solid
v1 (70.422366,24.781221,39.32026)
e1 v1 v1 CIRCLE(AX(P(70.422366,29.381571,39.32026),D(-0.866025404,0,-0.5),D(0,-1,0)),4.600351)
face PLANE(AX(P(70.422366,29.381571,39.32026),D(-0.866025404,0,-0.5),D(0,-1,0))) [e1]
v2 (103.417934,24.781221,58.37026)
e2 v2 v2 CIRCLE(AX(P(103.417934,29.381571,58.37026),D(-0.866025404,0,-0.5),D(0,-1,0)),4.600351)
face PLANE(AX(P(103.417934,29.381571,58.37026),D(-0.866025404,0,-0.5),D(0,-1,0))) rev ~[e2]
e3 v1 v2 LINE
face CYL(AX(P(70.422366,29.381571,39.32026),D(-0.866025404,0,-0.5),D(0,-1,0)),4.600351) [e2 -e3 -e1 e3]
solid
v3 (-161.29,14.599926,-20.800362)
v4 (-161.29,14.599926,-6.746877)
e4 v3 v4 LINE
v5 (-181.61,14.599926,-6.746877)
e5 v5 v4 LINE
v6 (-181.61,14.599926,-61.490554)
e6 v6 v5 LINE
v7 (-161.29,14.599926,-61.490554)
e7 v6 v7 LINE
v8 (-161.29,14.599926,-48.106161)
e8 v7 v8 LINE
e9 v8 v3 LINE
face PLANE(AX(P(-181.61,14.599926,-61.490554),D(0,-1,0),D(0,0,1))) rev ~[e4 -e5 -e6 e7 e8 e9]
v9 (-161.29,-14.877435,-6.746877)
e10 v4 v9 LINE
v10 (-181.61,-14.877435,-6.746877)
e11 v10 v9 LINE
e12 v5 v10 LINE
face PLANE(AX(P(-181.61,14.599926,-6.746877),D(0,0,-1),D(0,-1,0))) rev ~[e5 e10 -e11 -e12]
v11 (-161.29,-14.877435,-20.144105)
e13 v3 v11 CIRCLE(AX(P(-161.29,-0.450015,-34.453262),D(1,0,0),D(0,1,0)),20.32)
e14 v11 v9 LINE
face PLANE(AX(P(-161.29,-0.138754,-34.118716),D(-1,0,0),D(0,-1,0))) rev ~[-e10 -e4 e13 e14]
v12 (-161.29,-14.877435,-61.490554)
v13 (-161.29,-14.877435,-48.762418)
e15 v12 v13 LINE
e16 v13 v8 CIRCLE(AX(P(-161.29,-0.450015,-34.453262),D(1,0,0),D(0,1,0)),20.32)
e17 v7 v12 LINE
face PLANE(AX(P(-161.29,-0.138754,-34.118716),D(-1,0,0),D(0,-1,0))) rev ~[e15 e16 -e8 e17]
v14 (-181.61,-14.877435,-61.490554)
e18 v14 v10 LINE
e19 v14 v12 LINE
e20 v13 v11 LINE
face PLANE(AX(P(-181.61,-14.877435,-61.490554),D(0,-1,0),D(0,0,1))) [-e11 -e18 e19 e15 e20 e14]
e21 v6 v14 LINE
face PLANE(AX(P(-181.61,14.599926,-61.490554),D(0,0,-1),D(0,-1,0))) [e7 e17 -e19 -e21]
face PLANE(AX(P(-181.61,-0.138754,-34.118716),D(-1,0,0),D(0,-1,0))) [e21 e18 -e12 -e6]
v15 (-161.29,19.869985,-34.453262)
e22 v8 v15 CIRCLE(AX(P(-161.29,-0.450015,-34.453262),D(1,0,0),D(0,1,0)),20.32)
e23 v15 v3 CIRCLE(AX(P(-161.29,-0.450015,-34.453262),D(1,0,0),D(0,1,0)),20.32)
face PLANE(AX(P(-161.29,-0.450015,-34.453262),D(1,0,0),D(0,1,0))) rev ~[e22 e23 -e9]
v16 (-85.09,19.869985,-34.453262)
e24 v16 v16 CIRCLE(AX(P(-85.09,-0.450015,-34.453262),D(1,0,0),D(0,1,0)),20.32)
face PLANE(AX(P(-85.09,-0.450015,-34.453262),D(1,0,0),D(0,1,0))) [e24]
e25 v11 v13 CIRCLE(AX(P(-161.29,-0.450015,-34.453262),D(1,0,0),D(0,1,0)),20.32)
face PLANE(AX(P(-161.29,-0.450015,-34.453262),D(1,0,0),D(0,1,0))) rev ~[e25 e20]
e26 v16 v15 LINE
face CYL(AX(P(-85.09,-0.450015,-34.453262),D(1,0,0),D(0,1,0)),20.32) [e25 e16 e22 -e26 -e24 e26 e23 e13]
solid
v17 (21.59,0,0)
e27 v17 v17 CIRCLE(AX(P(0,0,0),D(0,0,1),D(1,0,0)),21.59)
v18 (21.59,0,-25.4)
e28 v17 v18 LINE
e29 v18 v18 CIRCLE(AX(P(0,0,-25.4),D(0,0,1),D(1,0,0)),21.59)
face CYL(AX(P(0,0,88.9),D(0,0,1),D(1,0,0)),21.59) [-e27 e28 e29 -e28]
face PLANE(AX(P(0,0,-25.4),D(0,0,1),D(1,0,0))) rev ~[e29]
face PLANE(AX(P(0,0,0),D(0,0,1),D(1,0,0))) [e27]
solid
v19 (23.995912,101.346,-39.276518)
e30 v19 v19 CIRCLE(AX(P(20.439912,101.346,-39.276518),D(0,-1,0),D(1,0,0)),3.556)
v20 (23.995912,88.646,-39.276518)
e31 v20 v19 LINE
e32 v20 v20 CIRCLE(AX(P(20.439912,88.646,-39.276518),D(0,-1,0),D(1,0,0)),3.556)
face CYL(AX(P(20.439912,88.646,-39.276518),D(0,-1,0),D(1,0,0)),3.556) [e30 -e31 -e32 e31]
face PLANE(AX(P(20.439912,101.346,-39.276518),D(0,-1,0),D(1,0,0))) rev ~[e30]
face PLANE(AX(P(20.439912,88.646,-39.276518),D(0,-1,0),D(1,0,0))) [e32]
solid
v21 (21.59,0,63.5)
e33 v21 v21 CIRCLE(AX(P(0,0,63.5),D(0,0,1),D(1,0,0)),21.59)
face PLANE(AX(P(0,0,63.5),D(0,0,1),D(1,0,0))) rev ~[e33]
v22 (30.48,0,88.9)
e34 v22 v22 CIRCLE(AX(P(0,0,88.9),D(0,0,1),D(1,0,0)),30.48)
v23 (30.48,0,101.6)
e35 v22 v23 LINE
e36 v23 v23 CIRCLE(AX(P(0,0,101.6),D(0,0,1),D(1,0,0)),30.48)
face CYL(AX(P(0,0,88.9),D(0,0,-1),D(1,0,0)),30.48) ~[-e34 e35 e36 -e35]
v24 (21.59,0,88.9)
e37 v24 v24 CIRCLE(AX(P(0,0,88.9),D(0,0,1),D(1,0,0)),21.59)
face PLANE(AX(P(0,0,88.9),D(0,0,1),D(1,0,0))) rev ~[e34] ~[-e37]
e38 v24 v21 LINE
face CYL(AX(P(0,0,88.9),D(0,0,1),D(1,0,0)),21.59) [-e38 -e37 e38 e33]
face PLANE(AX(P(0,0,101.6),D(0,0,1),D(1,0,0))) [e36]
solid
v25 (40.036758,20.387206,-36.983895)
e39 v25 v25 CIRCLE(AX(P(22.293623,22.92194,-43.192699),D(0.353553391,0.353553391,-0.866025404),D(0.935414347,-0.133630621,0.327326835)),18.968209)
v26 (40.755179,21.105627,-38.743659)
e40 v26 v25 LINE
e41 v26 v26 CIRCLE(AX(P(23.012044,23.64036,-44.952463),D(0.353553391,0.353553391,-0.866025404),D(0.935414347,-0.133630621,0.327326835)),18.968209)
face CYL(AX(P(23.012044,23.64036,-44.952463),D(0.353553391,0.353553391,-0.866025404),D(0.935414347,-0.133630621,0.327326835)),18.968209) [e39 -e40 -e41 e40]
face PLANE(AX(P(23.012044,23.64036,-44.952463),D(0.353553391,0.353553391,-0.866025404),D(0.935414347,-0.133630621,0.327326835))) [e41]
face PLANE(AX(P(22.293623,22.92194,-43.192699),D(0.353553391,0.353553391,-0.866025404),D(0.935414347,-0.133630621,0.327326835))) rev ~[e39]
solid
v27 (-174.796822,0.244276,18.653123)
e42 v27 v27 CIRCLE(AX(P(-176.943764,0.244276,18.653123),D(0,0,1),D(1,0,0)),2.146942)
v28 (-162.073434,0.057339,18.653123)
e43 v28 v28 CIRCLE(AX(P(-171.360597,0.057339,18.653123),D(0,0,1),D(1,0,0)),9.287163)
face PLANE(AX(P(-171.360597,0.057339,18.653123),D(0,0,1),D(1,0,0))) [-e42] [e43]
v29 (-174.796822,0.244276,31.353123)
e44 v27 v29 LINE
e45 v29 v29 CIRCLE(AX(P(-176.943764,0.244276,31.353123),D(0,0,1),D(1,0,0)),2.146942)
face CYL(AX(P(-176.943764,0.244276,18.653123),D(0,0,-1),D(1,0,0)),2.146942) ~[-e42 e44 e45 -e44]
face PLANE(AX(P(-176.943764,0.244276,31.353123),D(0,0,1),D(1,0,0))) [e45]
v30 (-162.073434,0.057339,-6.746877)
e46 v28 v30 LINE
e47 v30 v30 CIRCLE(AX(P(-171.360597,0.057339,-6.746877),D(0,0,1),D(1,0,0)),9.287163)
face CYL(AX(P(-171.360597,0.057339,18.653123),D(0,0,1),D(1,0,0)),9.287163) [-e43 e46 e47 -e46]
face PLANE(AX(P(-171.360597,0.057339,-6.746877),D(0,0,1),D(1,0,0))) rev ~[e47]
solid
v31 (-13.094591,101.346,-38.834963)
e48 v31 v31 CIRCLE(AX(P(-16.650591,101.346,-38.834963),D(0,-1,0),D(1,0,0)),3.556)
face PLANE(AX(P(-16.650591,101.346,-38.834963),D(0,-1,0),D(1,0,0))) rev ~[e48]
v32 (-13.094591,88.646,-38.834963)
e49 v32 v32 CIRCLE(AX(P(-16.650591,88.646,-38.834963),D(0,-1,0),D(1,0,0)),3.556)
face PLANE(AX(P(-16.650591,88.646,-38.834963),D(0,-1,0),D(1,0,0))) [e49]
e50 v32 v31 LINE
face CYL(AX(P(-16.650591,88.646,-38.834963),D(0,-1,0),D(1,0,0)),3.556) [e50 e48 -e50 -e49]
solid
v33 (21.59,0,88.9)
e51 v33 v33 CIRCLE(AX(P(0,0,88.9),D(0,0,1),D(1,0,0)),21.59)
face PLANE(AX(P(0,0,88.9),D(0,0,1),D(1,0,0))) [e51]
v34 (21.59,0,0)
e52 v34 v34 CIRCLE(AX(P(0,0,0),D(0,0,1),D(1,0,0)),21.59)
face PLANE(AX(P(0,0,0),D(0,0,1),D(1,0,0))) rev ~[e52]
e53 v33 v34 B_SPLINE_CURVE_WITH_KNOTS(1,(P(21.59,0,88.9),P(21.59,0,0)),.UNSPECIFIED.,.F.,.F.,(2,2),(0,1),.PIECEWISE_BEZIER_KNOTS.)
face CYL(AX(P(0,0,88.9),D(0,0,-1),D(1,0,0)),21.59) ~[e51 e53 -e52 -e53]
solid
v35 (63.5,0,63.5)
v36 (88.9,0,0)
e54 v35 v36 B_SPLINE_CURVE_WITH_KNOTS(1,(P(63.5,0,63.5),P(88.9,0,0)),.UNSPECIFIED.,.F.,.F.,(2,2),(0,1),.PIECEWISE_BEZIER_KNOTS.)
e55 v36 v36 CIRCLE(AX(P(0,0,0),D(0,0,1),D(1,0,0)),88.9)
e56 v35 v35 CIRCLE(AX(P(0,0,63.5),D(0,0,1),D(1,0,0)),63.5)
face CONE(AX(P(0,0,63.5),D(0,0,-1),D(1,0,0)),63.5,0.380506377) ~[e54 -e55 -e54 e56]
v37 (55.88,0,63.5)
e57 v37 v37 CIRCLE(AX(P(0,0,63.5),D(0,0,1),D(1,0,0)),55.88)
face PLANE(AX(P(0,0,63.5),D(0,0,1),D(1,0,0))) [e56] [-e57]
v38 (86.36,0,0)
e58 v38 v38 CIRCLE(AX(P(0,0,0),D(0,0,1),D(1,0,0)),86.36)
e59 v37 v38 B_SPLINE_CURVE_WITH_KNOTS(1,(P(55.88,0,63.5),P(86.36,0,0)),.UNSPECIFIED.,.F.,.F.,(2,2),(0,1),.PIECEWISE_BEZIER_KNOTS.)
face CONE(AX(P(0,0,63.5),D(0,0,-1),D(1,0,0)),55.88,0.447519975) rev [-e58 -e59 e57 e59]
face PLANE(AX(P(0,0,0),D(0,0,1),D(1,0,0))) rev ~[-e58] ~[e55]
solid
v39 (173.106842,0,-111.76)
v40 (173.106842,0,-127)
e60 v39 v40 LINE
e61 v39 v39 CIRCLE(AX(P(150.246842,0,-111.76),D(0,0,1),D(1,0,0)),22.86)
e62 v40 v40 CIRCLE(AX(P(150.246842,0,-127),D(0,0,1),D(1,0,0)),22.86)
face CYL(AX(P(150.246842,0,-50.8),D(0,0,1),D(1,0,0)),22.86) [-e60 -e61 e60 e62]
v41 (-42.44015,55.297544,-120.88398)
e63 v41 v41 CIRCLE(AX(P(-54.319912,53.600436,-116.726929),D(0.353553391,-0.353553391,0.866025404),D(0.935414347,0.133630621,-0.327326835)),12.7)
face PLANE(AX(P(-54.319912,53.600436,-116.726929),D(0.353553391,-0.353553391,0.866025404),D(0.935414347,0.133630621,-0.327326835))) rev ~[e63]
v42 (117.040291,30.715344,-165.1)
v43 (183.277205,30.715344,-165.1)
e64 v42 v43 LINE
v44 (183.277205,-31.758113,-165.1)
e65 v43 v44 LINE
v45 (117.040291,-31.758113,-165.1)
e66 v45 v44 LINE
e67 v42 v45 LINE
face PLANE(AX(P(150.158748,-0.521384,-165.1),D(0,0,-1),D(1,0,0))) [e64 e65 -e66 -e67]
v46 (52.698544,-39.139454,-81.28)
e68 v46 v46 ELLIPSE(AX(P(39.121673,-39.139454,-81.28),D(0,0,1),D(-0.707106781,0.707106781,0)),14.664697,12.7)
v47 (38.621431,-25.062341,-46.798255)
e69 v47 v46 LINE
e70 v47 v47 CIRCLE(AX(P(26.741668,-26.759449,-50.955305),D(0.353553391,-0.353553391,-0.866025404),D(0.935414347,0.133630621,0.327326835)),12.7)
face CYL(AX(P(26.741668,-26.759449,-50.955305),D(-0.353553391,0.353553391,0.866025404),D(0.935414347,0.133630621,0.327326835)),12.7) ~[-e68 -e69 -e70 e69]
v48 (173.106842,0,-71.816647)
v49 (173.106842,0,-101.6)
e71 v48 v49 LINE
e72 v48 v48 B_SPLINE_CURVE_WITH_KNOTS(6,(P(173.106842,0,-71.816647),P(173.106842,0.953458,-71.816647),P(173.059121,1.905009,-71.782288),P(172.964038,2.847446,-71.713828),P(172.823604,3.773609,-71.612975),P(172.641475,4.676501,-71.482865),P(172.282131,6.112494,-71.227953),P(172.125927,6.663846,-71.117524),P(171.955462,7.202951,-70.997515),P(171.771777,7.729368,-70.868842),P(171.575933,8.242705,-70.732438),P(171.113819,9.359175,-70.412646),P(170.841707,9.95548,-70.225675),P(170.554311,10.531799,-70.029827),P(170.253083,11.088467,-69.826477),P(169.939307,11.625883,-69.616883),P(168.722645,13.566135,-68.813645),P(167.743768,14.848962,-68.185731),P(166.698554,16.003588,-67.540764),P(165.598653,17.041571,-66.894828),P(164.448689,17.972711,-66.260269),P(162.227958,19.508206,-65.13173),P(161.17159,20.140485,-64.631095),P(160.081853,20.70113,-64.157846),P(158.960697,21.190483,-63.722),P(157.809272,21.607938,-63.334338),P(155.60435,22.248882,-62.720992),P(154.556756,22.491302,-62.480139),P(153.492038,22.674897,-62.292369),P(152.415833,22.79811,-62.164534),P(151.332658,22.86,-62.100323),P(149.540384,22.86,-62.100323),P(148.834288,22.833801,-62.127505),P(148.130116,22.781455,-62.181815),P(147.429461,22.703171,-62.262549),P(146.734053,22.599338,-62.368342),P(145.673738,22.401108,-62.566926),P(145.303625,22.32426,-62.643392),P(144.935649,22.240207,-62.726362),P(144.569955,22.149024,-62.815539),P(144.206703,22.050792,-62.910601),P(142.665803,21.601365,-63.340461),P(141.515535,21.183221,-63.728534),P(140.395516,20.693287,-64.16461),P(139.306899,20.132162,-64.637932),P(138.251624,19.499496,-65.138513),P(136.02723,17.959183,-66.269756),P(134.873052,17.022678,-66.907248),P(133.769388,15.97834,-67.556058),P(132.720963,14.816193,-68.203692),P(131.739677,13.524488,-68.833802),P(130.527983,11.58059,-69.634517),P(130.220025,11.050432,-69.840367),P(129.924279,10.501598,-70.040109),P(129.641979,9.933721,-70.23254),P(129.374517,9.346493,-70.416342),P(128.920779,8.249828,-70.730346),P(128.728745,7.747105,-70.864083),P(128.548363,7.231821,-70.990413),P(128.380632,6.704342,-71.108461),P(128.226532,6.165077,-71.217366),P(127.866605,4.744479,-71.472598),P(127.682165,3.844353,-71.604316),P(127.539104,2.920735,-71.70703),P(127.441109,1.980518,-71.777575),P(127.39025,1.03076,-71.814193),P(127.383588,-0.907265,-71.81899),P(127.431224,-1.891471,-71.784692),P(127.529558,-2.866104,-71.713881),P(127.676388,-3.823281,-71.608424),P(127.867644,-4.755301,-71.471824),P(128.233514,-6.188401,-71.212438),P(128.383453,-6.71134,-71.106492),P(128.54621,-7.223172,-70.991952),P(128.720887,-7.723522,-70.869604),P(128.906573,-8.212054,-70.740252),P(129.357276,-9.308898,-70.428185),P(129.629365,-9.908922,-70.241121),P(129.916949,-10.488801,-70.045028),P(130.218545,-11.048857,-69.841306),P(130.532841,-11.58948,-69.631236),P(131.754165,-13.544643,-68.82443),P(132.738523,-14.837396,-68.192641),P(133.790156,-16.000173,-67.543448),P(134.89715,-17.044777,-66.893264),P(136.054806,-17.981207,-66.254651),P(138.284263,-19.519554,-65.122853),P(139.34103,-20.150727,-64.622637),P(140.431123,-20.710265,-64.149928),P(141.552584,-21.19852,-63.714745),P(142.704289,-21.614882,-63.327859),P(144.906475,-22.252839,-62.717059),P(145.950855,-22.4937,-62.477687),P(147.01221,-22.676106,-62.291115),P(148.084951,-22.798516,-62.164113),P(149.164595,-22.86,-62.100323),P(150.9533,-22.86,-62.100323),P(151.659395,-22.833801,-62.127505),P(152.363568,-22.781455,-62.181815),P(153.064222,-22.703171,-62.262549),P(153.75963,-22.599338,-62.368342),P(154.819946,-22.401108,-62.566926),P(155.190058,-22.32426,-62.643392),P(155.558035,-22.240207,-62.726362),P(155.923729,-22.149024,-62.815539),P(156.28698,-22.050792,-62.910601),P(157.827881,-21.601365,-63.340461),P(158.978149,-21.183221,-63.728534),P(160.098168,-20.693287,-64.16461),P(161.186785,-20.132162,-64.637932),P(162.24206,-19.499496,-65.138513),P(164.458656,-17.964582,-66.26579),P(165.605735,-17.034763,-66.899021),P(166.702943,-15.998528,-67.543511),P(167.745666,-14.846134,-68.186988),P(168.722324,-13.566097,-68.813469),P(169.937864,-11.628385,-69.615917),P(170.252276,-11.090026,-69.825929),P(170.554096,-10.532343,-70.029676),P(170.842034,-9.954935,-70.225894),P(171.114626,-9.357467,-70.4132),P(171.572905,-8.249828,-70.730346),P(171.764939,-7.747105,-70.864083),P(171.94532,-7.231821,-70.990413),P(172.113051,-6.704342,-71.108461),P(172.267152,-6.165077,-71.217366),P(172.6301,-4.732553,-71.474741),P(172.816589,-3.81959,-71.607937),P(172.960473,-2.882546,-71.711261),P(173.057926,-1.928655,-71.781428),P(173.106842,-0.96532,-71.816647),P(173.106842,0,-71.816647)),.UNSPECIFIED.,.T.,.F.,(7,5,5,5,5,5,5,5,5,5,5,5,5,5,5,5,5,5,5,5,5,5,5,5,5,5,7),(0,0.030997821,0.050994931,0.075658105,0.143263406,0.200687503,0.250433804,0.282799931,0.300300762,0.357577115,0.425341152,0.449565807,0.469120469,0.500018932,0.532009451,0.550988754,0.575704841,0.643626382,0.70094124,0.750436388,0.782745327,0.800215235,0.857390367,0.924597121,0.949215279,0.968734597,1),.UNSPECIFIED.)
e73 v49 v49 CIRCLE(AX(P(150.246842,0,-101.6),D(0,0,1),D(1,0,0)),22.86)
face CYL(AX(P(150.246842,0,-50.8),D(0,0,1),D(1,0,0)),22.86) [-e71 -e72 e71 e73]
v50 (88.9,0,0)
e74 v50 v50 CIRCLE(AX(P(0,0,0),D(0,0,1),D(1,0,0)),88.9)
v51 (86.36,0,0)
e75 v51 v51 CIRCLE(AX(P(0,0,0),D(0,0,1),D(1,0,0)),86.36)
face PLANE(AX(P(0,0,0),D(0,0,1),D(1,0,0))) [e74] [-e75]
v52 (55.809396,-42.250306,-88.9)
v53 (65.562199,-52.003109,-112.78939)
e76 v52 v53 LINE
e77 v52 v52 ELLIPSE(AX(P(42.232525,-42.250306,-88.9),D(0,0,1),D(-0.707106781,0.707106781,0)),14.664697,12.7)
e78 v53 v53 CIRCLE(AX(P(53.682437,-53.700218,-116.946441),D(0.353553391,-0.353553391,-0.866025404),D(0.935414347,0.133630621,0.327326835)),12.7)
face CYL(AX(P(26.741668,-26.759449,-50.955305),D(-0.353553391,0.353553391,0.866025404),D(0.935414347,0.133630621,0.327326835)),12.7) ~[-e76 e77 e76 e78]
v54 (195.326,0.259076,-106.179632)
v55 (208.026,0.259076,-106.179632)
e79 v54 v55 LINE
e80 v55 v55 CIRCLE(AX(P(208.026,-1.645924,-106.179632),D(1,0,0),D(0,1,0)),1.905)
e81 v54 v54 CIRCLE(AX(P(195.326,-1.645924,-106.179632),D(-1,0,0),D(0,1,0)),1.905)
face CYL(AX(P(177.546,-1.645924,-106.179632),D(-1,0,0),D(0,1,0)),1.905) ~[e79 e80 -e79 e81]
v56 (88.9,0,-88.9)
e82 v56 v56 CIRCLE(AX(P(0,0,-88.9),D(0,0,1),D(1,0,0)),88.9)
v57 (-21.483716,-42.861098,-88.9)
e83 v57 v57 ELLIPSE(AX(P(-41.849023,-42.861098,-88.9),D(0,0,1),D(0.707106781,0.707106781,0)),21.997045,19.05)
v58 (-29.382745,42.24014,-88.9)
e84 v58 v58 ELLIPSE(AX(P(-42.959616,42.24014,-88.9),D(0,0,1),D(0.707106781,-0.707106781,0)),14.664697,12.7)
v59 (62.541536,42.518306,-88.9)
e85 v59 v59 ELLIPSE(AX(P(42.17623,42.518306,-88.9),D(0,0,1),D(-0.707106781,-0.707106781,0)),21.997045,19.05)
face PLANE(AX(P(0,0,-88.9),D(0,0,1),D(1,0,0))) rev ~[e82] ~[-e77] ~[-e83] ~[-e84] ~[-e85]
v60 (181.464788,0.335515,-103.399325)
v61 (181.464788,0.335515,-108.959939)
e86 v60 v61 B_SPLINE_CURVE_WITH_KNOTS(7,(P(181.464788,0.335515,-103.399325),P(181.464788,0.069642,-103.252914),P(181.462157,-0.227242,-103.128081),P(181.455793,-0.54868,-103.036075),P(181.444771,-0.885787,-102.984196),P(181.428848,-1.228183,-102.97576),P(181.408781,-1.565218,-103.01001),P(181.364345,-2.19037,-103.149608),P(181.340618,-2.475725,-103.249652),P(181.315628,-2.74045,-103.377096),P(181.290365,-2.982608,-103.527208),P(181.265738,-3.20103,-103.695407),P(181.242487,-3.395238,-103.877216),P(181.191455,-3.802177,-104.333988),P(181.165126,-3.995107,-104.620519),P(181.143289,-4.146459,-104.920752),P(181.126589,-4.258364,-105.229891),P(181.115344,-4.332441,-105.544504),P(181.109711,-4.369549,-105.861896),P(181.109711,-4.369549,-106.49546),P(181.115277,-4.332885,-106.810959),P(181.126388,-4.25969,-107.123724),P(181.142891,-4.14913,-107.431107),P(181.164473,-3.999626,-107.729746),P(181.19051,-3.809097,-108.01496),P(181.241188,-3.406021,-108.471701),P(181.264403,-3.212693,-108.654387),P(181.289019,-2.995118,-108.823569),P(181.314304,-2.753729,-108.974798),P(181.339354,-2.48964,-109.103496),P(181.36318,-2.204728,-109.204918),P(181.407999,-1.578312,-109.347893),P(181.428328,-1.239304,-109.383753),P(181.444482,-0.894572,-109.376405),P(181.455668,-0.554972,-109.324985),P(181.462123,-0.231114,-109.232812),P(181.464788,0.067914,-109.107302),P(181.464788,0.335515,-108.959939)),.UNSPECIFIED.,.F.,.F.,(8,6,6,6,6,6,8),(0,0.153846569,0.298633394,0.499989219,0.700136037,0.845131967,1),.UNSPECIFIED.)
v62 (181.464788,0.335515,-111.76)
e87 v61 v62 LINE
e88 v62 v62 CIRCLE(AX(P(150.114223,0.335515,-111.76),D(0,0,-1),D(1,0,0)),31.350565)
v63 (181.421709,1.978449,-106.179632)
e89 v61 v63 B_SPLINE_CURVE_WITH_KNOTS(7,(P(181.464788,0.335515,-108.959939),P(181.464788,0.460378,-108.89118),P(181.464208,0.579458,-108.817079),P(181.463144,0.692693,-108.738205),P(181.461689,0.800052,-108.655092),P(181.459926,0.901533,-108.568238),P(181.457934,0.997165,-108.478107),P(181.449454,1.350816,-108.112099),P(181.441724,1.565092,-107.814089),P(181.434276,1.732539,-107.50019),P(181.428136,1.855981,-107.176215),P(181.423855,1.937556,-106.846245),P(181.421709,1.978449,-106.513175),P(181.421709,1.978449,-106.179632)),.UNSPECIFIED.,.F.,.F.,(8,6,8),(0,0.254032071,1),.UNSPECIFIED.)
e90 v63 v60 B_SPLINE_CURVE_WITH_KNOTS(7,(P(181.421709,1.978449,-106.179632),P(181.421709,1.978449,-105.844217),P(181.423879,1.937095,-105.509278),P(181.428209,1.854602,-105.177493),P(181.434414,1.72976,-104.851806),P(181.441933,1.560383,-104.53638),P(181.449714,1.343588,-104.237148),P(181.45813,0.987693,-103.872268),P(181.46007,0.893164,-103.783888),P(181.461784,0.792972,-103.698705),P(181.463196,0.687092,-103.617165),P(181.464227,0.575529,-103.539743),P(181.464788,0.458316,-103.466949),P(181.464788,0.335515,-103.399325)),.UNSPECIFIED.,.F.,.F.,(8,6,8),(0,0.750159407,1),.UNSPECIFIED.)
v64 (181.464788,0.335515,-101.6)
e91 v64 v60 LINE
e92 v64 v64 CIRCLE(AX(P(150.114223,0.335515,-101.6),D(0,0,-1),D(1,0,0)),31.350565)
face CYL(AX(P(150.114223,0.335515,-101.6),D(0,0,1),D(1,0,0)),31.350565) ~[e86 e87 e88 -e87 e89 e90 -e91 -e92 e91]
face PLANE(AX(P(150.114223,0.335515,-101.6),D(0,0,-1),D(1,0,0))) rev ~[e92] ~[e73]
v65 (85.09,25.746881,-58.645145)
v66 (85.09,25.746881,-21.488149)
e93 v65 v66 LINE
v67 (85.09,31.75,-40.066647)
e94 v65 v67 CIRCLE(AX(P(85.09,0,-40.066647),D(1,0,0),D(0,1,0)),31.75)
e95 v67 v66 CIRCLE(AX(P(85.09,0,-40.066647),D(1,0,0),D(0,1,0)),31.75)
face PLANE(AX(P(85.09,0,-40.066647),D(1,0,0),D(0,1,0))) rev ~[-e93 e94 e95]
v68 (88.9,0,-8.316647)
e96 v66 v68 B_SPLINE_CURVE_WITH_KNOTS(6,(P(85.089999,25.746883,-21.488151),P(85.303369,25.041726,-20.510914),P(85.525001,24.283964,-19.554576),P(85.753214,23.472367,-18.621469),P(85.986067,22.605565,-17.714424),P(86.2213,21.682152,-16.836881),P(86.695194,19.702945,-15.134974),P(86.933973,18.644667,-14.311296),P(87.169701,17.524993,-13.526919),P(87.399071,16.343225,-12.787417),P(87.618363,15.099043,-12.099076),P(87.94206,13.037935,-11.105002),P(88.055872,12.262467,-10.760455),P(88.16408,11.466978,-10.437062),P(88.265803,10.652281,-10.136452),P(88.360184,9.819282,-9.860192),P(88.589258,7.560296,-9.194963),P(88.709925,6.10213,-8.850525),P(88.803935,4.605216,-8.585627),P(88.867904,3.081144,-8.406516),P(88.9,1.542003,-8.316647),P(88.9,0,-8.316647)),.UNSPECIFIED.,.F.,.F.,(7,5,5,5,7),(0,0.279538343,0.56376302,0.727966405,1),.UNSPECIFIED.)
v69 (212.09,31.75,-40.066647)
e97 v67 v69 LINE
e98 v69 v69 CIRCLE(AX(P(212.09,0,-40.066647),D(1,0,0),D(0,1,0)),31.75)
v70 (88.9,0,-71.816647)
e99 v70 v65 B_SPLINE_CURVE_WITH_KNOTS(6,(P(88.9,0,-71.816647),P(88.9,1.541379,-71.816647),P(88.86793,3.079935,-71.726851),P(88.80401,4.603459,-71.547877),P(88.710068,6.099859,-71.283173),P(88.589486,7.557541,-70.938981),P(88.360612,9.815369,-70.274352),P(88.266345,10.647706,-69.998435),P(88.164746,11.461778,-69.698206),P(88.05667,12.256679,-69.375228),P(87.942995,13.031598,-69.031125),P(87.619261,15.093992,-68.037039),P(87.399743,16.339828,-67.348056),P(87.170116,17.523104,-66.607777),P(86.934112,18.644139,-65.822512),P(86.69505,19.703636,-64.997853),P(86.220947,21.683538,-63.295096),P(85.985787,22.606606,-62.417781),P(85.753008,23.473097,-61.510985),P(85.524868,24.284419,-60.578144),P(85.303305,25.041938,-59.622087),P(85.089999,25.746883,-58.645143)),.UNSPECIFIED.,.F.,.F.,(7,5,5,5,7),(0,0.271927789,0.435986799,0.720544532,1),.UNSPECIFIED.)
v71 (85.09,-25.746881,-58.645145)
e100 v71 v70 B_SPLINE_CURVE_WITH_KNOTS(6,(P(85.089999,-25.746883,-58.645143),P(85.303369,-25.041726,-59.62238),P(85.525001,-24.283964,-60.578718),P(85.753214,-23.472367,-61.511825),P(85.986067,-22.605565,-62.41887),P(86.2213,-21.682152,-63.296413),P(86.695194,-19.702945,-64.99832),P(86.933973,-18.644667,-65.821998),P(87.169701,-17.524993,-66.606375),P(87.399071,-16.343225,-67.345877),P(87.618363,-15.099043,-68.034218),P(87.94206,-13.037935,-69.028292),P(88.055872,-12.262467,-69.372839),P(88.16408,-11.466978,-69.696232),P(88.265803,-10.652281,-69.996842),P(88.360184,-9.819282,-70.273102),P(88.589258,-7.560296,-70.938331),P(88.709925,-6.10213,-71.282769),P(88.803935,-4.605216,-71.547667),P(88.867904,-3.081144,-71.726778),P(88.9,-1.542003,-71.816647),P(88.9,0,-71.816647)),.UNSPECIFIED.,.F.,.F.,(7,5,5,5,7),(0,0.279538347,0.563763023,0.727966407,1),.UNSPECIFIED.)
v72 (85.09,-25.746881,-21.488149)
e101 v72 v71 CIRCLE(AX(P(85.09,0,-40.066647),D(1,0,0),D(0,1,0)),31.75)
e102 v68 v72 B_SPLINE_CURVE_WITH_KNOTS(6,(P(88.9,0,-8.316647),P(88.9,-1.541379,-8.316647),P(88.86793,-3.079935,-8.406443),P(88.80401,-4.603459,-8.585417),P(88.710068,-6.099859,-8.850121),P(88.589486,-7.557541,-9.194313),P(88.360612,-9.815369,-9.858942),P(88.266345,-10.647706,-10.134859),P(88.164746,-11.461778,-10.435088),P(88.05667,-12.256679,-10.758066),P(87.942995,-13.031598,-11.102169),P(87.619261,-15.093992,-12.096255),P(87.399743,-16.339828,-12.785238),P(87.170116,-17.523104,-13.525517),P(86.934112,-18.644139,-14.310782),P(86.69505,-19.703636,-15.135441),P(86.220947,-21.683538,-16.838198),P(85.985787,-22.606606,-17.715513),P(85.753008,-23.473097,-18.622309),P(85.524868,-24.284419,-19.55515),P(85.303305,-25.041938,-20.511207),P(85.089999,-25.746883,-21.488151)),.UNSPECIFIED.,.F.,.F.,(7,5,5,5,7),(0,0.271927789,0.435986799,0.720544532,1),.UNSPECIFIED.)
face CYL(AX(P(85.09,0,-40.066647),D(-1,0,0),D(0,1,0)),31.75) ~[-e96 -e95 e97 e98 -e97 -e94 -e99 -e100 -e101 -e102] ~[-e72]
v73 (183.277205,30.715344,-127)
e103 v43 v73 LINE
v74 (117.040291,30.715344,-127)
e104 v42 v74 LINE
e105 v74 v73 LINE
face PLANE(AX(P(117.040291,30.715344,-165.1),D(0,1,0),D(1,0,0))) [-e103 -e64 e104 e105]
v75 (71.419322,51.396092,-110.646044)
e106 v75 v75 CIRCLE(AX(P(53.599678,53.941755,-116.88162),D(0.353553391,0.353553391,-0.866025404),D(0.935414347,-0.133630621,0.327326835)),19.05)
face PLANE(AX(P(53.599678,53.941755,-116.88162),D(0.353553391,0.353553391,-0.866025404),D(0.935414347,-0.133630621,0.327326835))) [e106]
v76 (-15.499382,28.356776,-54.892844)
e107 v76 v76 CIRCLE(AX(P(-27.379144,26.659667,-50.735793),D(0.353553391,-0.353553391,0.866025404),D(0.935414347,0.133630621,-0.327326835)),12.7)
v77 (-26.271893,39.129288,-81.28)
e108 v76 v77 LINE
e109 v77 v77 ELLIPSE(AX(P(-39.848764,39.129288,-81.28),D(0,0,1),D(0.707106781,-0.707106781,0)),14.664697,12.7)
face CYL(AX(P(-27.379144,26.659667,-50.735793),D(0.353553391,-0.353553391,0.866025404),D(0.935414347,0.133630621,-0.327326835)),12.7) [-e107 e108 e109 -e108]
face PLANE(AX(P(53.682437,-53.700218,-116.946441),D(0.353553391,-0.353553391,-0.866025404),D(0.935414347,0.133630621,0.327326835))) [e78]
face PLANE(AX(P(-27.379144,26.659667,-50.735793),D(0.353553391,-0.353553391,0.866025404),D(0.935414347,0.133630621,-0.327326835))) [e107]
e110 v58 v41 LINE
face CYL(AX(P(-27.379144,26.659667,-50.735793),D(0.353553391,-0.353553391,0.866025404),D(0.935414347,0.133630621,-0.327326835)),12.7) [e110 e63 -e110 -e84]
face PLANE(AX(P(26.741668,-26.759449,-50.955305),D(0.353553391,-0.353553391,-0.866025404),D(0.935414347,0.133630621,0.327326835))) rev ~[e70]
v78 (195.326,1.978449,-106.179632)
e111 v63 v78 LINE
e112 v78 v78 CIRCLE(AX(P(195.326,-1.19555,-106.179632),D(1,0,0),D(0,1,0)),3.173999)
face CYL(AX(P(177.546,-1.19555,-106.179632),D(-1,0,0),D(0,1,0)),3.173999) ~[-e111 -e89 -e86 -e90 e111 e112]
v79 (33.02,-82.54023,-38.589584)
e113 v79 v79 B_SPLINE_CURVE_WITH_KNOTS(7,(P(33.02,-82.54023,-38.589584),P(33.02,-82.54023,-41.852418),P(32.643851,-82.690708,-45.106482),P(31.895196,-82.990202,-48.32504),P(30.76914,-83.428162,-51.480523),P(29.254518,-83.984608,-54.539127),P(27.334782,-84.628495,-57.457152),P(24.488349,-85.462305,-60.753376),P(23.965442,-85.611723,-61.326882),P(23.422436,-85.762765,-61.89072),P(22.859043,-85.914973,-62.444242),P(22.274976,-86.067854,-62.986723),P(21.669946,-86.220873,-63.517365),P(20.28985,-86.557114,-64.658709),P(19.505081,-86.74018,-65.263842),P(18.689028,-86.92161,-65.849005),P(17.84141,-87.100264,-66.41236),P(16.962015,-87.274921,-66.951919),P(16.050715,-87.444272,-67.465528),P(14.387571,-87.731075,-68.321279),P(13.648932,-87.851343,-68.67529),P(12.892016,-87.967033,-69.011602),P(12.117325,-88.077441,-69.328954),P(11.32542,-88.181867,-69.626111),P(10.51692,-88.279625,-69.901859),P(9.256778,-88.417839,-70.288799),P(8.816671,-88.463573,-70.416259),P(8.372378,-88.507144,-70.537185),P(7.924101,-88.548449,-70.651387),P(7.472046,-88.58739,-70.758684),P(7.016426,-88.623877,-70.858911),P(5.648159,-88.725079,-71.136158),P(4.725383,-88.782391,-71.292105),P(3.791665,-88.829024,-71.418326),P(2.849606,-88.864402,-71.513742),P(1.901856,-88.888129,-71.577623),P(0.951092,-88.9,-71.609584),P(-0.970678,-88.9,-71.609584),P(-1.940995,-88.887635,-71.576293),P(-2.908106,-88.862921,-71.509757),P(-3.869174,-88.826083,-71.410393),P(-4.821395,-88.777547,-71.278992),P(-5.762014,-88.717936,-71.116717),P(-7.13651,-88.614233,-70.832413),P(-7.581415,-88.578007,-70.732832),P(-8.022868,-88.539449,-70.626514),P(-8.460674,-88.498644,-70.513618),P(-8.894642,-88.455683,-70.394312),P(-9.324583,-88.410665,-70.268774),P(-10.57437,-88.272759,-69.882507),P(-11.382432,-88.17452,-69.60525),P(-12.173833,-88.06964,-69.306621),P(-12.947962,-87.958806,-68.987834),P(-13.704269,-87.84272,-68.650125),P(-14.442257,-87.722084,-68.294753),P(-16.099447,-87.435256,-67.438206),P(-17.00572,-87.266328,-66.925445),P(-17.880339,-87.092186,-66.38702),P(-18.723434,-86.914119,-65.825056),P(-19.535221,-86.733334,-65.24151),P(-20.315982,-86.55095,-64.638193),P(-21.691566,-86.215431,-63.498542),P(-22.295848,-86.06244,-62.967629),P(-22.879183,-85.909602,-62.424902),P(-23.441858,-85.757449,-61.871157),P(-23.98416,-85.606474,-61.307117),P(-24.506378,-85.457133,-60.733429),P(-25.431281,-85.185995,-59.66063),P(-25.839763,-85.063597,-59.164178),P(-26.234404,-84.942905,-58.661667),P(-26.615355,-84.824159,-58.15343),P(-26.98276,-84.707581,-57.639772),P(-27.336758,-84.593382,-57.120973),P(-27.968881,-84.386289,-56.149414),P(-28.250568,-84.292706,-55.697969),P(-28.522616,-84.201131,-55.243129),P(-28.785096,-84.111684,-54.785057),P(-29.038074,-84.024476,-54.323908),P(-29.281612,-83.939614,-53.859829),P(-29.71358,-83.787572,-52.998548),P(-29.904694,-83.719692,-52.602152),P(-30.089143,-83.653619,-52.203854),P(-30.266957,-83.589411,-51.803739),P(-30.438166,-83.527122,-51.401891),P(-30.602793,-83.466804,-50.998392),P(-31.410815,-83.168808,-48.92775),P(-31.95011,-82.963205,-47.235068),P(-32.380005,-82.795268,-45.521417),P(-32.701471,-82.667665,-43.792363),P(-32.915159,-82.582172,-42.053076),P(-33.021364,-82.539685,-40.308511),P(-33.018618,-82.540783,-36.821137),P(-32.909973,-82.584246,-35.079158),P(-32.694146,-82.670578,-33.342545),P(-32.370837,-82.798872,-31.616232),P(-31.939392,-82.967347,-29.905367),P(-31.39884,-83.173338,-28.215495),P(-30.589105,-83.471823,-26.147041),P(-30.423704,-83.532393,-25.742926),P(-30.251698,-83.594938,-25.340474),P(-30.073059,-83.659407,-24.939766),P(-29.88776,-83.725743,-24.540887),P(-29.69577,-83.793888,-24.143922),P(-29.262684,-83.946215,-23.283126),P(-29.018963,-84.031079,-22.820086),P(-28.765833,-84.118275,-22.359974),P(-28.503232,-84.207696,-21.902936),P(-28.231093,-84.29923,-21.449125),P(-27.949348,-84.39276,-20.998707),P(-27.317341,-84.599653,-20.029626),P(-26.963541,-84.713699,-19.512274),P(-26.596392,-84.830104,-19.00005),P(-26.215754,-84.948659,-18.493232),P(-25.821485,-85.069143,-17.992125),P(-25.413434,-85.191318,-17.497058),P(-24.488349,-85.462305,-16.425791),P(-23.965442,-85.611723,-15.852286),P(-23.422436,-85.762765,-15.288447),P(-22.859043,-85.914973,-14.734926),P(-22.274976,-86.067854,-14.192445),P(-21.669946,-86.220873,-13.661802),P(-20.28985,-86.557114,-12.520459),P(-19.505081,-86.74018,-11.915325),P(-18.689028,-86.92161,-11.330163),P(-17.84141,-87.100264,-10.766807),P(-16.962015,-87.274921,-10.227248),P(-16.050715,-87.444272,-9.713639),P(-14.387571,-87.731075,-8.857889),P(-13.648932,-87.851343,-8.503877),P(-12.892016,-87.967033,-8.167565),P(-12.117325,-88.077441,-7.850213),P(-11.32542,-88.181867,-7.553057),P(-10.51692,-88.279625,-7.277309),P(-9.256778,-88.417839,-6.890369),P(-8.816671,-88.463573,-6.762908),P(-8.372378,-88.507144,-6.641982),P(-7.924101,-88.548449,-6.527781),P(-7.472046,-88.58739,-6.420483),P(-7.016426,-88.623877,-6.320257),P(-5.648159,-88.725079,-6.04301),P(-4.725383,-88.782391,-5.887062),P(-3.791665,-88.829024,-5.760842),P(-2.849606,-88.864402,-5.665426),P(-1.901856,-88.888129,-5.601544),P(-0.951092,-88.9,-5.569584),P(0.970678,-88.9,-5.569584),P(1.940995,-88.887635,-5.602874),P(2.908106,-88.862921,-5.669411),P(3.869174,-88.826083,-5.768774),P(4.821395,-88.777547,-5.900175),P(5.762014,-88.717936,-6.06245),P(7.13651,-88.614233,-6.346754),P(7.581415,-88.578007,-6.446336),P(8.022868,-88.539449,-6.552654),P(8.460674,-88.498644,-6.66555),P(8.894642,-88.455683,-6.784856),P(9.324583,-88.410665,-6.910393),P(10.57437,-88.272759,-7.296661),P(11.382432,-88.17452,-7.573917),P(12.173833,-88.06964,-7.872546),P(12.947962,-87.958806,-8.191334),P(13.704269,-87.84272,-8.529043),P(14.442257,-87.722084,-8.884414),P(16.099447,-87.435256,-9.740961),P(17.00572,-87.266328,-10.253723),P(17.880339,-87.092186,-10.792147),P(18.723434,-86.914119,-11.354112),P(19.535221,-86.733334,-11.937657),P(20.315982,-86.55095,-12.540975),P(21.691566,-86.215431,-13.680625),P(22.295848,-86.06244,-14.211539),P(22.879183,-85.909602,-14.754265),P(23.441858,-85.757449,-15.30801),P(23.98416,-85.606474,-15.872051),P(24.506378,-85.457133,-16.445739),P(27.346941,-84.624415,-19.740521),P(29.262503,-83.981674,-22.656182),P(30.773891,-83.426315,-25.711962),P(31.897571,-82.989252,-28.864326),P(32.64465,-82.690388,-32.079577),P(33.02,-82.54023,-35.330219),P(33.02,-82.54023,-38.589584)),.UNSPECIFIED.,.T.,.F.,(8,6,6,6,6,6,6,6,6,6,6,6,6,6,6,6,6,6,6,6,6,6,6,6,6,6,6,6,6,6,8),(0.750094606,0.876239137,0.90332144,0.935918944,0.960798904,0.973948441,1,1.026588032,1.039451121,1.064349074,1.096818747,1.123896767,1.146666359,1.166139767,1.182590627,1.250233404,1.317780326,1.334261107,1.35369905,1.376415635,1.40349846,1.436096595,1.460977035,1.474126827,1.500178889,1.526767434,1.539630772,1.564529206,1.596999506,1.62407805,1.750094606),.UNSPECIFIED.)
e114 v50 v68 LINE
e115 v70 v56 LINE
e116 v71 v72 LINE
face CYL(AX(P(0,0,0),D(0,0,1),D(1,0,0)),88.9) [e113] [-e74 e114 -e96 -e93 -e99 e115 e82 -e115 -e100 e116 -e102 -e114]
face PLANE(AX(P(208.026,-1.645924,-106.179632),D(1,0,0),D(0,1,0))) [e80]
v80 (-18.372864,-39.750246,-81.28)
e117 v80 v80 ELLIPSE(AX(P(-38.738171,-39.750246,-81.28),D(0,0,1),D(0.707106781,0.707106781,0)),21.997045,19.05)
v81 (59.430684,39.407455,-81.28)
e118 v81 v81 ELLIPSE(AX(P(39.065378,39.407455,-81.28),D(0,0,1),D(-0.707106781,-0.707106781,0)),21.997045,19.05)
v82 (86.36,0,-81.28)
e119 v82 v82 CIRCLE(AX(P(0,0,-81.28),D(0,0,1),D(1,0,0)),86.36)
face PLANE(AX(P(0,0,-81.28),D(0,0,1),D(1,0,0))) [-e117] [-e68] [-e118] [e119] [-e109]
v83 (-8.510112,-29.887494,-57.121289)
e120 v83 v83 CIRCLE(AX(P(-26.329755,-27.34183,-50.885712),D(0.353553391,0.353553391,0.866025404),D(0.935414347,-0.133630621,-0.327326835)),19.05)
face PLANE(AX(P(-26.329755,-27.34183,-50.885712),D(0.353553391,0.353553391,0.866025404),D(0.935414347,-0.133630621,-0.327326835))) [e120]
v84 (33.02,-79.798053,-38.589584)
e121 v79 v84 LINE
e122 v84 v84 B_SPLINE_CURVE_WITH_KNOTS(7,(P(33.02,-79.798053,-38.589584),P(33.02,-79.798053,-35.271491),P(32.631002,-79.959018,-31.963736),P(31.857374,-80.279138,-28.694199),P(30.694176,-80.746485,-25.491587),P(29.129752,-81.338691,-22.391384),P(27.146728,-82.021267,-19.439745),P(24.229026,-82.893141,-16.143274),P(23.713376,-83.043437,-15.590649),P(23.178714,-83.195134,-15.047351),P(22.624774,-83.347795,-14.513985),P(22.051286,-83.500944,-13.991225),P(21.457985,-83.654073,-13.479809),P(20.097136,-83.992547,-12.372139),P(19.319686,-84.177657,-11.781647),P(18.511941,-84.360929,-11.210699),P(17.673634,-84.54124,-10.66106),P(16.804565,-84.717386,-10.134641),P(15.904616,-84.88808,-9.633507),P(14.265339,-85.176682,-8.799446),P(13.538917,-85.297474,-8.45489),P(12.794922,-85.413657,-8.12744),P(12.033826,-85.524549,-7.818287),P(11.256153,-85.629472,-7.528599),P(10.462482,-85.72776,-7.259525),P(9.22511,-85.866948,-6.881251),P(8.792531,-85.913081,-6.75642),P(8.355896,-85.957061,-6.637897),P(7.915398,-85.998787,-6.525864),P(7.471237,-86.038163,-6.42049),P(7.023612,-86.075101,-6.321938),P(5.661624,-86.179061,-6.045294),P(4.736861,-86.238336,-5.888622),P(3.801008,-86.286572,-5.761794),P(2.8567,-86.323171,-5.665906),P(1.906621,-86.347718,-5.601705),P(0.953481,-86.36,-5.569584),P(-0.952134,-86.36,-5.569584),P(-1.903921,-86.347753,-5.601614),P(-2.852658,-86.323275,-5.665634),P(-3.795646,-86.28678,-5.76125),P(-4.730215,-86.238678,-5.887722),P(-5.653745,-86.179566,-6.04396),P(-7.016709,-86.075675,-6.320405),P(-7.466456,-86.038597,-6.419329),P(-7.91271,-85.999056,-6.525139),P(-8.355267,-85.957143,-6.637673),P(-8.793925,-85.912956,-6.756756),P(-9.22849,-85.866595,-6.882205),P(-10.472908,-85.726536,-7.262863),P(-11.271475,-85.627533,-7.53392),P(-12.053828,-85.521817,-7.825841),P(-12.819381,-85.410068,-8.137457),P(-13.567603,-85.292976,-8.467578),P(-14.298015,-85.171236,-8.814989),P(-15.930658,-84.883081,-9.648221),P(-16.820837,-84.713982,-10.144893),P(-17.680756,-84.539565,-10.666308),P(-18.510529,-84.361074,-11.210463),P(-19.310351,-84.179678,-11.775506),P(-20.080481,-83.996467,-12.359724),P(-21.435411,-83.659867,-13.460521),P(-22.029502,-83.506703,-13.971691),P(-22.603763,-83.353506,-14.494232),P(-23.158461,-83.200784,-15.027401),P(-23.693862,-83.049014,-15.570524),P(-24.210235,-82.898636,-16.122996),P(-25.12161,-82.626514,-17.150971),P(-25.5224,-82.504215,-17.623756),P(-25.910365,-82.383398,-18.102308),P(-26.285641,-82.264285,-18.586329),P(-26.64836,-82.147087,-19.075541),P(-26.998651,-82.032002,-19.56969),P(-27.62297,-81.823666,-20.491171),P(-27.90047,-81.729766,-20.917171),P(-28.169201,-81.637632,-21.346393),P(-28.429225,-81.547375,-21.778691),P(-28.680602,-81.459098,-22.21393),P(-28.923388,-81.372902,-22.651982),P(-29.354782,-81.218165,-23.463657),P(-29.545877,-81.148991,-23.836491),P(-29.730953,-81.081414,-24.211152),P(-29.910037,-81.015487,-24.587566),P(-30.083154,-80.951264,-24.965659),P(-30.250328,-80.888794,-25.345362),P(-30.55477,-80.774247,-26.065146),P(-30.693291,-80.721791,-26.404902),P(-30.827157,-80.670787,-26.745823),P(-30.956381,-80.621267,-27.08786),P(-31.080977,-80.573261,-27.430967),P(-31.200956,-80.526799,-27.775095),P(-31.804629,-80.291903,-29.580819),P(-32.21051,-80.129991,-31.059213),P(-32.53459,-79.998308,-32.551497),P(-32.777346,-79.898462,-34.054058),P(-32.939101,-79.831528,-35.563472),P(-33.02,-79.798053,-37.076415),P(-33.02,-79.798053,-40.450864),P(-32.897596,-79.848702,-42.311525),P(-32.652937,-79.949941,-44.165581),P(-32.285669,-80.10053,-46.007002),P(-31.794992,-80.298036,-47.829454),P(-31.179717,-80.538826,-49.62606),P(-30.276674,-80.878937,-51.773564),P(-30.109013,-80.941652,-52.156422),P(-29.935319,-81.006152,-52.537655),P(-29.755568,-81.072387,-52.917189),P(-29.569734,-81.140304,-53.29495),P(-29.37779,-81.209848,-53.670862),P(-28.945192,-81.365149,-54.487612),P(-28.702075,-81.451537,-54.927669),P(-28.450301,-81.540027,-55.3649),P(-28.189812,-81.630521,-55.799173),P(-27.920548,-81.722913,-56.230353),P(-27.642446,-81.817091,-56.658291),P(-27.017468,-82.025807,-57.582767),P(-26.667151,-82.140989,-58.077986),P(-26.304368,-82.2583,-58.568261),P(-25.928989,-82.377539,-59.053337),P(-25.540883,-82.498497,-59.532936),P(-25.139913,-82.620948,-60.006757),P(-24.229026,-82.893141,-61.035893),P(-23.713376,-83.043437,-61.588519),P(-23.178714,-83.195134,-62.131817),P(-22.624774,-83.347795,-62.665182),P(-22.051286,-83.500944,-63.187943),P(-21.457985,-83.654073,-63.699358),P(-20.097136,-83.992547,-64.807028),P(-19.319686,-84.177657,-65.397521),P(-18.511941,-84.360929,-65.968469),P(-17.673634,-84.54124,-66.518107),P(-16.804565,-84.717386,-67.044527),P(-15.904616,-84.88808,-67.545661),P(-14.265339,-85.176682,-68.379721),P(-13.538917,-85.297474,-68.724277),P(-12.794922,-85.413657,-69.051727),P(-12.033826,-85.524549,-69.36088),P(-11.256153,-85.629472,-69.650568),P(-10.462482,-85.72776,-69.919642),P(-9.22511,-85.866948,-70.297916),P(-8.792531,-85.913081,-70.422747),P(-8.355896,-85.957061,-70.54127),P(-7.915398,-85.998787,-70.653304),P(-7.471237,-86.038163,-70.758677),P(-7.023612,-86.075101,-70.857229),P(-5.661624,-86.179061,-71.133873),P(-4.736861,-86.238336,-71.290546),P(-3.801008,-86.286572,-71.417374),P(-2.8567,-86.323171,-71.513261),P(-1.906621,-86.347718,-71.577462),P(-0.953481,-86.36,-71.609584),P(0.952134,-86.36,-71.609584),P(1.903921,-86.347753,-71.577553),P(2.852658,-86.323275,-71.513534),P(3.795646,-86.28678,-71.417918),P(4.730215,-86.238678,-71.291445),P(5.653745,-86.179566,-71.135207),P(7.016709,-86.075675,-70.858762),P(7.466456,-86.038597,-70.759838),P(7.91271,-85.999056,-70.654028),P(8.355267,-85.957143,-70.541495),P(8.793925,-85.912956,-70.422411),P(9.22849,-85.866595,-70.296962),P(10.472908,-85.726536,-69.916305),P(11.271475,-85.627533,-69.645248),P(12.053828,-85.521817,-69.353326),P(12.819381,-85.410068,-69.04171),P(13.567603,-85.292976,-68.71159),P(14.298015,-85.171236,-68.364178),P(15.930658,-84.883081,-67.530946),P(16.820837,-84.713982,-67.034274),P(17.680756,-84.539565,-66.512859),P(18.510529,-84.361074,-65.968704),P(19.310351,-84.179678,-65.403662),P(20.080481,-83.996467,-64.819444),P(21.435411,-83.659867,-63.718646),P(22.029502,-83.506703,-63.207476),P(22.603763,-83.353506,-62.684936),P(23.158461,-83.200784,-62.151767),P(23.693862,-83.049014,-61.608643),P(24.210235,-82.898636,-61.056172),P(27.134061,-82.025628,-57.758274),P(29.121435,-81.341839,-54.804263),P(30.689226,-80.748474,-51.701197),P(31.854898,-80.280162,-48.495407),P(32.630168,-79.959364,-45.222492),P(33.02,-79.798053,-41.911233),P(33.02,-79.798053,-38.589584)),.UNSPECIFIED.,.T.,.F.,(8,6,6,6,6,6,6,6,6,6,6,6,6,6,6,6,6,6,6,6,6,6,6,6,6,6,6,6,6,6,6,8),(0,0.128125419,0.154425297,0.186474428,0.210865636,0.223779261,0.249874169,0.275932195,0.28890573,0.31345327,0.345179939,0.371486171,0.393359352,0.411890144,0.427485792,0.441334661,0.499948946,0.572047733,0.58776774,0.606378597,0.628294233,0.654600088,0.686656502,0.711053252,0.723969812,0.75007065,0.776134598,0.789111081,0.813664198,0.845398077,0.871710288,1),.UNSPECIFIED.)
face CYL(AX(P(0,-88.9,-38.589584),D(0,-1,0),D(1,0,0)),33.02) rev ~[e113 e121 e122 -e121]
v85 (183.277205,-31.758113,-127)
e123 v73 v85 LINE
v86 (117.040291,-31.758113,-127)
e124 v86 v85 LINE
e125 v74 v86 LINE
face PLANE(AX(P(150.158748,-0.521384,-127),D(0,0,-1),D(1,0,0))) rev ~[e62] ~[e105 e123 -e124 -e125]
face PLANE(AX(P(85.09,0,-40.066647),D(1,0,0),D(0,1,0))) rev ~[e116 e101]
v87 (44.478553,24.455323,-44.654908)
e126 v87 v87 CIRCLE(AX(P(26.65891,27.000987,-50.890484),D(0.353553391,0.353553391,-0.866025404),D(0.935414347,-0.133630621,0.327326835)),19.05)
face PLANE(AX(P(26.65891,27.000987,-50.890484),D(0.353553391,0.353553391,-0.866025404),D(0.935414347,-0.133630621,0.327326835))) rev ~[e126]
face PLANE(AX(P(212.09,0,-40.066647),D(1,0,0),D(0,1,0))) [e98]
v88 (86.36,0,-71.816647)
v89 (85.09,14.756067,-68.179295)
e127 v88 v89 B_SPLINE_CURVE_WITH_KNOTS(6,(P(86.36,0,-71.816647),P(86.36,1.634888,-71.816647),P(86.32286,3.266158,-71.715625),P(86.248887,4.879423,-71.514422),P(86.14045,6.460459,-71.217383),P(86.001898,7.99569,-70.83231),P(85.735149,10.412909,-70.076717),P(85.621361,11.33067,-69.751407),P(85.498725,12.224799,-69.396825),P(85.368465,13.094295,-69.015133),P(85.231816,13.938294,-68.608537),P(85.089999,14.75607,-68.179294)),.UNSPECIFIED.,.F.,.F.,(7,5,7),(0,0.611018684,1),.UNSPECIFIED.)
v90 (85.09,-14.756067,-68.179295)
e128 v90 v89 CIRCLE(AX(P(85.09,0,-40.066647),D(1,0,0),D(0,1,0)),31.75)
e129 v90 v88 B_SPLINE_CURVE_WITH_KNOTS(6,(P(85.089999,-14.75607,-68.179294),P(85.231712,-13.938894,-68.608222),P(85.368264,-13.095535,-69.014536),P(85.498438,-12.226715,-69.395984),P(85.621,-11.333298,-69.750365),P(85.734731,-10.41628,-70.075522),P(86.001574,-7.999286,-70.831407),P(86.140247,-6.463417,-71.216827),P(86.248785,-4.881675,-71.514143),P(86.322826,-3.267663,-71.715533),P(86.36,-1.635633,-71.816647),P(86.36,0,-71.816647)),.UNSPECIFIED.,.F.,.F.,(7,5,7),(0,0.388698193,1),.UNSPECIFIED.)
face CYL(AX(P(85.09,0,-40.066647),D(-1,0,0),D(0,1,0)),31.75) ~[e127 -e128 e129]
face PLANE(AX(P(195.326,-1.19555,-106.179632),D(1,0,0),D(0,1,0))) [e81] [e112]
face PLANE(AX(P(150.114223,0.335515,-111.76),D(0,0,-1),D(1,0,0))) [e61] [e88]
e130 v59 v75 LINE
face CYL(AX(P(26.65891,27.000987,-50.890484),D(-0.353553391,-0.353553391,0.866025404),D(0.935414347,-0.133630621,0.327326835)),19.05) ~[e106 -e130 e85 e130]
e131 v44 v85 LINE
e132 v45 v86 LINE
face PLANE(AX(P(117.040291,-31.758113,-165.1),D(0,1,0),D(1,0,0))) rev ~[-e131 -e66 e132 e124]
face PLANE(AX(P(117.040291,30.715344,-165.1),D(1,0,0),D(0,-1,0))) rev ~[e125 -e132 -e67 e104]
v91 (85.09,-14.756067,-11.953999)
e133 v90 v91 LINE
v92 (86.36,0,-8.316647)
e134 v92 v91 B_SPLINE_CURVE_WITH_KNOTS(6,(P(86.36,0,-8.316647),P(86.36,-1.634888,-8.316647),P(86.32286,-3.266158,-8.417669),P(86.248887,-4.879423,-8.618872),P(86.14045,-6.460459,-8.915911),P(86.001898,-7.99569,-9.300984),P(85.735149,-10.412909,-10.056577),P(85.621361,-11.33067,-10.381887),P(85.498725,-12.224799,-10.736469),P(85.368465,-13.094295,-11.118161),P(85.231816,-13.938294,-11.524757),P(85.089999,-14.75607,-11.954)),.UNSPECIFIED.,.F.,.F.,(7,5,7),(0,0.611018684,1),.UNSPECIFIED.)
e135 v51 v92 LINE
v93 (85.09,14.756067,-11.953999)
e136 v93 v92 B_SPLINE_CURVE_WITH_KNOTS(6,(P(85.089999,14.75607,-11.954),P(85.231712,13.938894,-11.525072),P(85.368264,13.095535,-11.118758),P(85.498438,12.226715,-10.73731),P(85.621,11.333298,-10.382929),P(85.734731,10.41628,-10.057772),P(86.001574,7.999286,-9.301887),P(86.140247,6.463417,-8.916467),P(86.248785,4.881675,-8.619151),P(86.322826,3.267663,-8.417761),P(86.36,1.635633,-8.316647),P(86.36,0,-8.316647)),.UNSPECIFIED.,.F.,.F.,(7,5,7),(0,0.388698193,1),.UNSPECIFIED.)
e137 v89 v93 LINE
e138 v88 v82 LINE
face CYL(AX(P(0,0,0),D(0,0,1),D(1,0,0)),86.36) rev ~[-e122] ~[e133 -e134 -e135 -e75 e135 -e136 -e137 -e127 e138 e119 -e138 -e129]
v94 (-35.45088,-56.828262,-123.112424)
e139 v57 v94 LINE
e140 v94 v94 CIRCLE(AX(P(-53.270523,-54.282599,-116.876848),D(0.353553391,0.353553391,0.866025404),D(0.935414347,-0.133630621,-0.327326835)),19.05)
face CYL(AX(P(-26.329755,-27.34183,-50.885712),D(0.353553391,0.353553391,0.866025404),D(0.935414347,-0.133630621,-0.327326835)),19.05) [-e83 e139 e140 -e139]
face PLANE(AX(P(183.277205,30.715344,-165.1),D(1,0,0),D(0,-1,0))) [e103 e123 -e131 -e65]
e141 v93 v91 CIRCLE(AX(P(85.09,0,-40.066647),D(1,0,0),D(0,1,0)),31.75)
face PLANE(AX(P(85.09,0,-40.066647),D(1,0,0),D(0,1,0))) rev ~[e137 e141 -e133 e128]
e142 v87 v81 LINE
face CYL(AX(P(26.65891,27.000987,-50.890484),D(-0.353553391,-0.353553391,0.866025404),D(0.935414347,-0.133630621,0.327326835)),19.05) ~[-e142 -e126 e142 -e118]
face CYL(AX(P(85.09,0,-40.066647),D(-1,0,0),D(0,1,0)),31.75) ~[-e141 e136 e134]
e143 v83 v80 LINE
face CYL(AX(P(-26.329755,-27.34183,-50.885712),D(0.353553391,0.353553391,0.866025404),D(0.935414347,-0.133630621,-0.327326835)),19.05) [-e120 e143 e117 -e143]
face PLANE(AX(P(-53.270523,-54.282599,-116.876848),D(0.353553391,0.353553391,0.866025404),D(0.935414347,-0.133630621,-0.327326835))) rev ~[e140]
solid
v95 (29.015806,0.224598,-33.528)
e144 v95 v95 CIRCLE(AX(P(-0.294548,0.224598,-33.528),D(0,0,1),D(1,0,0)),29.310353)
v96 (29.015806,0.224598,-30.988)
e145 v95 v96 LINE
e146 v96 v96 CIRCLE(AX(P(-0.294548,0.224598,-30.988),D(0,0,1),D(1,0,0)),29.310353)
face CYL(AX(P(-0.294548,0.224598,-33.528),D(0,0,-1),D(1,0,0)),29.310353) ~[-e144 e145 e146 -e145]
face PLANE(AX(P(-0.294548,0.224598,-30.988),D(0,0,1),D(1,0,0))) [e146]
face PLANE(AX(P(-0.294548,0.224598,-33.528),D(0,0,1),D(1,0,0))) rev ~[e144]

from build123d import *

# Parameters (mm, degrees)
F0_R       = 88.9
F1_DEPTH   = 88.9
F2_R       = 86.36
F3_DEPTH   = 81.28
F7_R       = 12.7
F8_DEPTH   = 76.2
F10_R      = 19.05
F11_DEPTH  = 76.2
F13_R      = 12.7
F14_DEPTH  = 76.2
F16_R      = 19.05
F17_DEPTH  = 76.2
F19_R      = 21.59
F20_DEPTH  = 114.3
F21_R      = 30.48
F22_DEPTH  = 12.7
F24_R      = 63.5
F25_R      = 55.88
F27_FACE_R = 21.59
F30_R      = 20.32
F31_DEPTH  = 76.2
F33_R      = 31.75
F34_DEPTH  = 127
F35_R      = 22.86
F36_DEPTH  = 76.2
F38_R      = 33.02
F39_DEPTH  = 12.7
F41_R      = 3.556
F43_DEPTH  = 12.7
F42_R      = 3.556
F44_DEPTH  = 12.7
F47_R      = 31.3505645065
F48_DEPTH  = 10.16
F50_R      = 3.173998601
F51_DEPTH  = 17.78
F52_R      = 1.905
F53_DEPTH  = 30.48
F55_R      = 29.310353423
F56_DEPTH  = 2.54
F58_R      = 18.968209012
F59_DEPTH  = 2.032
F61_W      = 66.2369132042
F61_H      = 62.4734573066
F62_DEPTH  = 38.1
F64_W      = 29.4773610658
F64_H      = 54.7436773777
F65_DEPTH  = 20.32
F67_R      = 9.2871625742
F68_DEPTH  = 25.4
F69_R      = 2.1469420822
F70_DEPTH  = 12.7
F73_R      = 4.6003508231
F74_DEPTH  = 38.1


with BuildPart() as f1:
    # F0 (on Top) → F1 (new body)
    with BuildSketch(Plane.XY):
        Circle(F0_R)
    extrude(amount=-F1_DEPTH)

    # F2 (on face) → F3 (cut)
    with BuildSketch(Plane.XY):
        Circle(F2_R)
    extrude(amount=-F3_DEPTH, mode=Mode.SUBTRACT)

    # F7 (on face) → F8 (join)
    with BuildSketch(Plane(origin=(-22.2894519575, 22.2894519575, -54.5977839421), x_dir=(0.9354143467, 0.133630621, -0.3273268354), z_dir=(0.3535533906, -0.3535533906, 0.8660254038))):
        with Locations((-5.4411096498, 5.5057285354)):
            Circle(F7_R)
    extrude(amount=-F8_DEPTH)

    # F10 (on face) → F11 (join)
    with BuildSketch(Plane(origin=(-22.2894519575, -22.2894519575, -54.5977839421), x_dir=(0.9354143467, -0.133630621, -0.3273268354), z_dir=(0.3535533906, 0.3535533906, 0.8660254038))):
        with Locations((-4.3192654848, -6.0806246474)):
            Circle(F10_R)
    extrude(amount=-F11_DEPTH)

    # F13 (on face) → F14 (join)
    with BuildSketch(Plane(origin=(22.2894519575, -22.2894519575, -54.5977839421), x_dir=(0.9354143467, 0.133630621, 0.3273268354), z_dir=(0.3535533906, -0.3535533906, -0.8660254038))):
        with Locations((4.7596194781, 5.515140947)):
            Circle(F13_R)
    extrude(amount=F14_DEPTH)

    # F16 (on face) → F17 (join)
    with BuildSketch(Plane(origin=(22.2894519575, 22.2894519575, -54.5977839421), x_dir=(0.9354143467, -0.133630621, 0.3273268354), z_dir=(0.3535533906, 0.3535533906, -0.8660254038))):
        with Locations((4.6711470932, -5.7632611133)):
            Circle(F16_R)
    extrude(amount=F17_DEPTH)

    # F33 (on offset) → F34 (join)
    with BuildSketch(Plane.YZ.offset(85.09)):
        with Locations((0, -40.0666470004)):
            Circle(F33_R)
    extrude(amount=F34_DEPTH)

    # F35 (on offset) → F36 (join)
    with BuildSketch(Plane.XY.offset(-50.8)):
        with Locations((150.2468418311, 0)):
            Circle(F35_R)
    extrude(amount=-F36_DEPTH)

    # F38 (on offset) → F39 (cut)
    with BuildSketch(Plane.XZ.offset(88.9)):
        with Locations((0, -38.5895837275)):
            Circle(F38_R)
    extrude(amount=-F39_DEPTH, mode=Mode.SUBTRACT)

    # F47 (on offset) → F48 (join)
    with BuildSketch(Plane(origin=(0, 0, -101.6), x_dir=(1, 0, 0), z_dir=(0, 0, -1))):
        with Locations((150.114223361, -0.3355145745)):
            Circle(F47_R)
    extrude(amount=F48_DEPTH)

    # F50 (on offset) → F51 (join)
    with BuildSketch(Plane.YZ.offset(177.546)):
        with Locations((-1.1955500813, -106.1796322465)):
            Circle(F50_R)
    extrude(amount=F51_DEPTH)

    # F52 (on offset) → F53 (join)
    with BuildSketch(Plane.YZ.offset(177.546)):
        with Locations((-1.6459240578, -106.1796322465)):
            Circle(F52_R)
    extrude(amount=F53_DEPTH)

    # F61 (on offset) → F62 (join)
    with BuildSketch(Plane(origin=(0, 0, -165.1), x_dir=(1, 0, 0), z_dir=(0, 0, -1))):
        with Locations((150.1587480307, 0.5213841796)):
            Rectangle(F61_W, F61_H)
    extrude(amount=-F62_DEPTH)


with BuildPart() as f20:
    # F19 (on offset) → F20 (new body)
    with BuildSketch(Plane.XY.offset(88.9)):
        Circle(F19_R)
    extrude(amount=-F20_DEPTH)

    # F21 (on offset) → F22 (join)
    with BuildSketch(Plane.XY.offset(88.9)):
        Circle(F21_R)
    extrude(amount=F22_DEPTH)


with BuildPart() as f26:
    # F24 (on offset) → F26 section 0
    with BuildSketch(Plane.XY.offset(63.5)):
        Circle(F24_R)
    # F0 (on Top) → F26 section 1
    with BuildSketch(Plane.XY):
        Circle(F0_R)
    loft()


with BuildPart() as f27_tool:
    # F25 (on offset) → F27 section 0
    with BuildSketch(Plane.XY.offset(63.5)):
        Circle(F25_R)
    # F2 (on face) → F27 section 1
    with BuildSketch(Plane.XY):
        Circle(F2_R)
    loft()


with BuildPart() as f20_1:
    add(f20.part)

    # F27: cut by f27_tool
    add(f27_tool.part, mode=Mode.SUBTRACT)


with BuildPart() as f26_1:
    add(f26.part)

    # F27: cut by f27_tool
    add(f27_tool.part, mode=Mode.SUBTRACT)


with BuildPart() as f28:
    # F19 (on offset) → F28 section 0
    with BuildSketch(Plane.XY.offset(88.9)):
        Circle(F19_R)
    # F27_face (on face) → F28 section 1
    with BuildSketch(Plane.XY):
        Circle(F27_FACE_R)
    loft()


with BuildPart() as f31:
    # F30 (on offset) → F31 (new body)
    with BuildSketch(Plane.YZ.offset(-85.09)):
        with Locations((-0.4500148934, -34.4532616436)):
            Circle(F30_R)
    extrude(amount=-F31_DEPTH)

    # F64 (on offset) → F65 (join)
    with BuildSketch(Plane(origin=(-181.61, 0, 0), x_dir=(0, -1, 0), z_dir=(-1, 0, 0))):
        with Locations((0.138754287, -34.1187156737)):
            Rectangle(F64_W, F64_H)
    extrude(amount=-F65_DEPTH)


with BuildPart() as f43:
    # F41 (on offset) → F43 (new body)
    with BuildSketch(Plane.XZ.offset(-88.646)):
        with Locations((20.4399116337, -39.2765179276)):
            Circle(F41_R)
    extrude(amount=-F43_DEPTH)


with BuildPart() as f44:
    # F42 (on offset) → F44 (new body)
    with BuildSketch(Plane.XZ.offset(-88.646)):
        with Locations((-16.6505910456, -38.8349629939)):
            Circle(F42_R)
    extrude(amount=-F44_DEPTH)


with BuildPart() as f56:
    # F55 (on offset) → F56 (new body)
    with BuildSketch(Plane.XY.offset(-33.528)):
        with Locations((-0.2945478482, 0.2245975047)):
            Circle(F55_R)
    extrude(amount=F56_DEPTH)


with BuildPart() as f59:
    # F58 (on offset) → F59 (new body)
    with BuildSketch(Plane(origin=(19.5953751212, 19.5953751212, -47.9986703653), x_dir=(0.9354143467, -0.133630621, 0.3273268354), z_dir=(0.3535533906, 0.3535533906, -0.8660254038))):
        with Locations((3.652572399, -4.896286875)):
            Circle(F58_R)
    extrude(amount=-F59_DEPTH)


with BuildPart() as f68:
    # F67 (on offset) → F68 (new body)
    with BuildSketch(Plane.XY.offset(18.6531230152)):
        with Locations((-171.3605970144, 0.0573388606)):
            Circle(F67_R)
    extrude(amount=-F68_DEPTH)

    # F69 (on face) → F70 (join)
    with BuildSketch(Plane.XY.offset(18.6531230152)):
        with Locations((-176.9437640905, 0.2442759869)):
            Circle(F69_R)
    extrude(amount=F70_DEPTH)


with BuildPart() as f74:
    # F73 (on face) → F74 (new body)
    with BuildSketch(Plane(origin=(69.8429465006, 0, 40.3238439631), x_dir=(0, -1, 0), z_dir=(-0.8660254038, 0, -0.5))):
        with Locations((-29.3815713376, -1.1588388588)):
            Circle(F73_R)
    extrude(amount=-F74_DEPTH)


solid = Compound([f1.part, f20_1.part, f26_1.part, f28.part, f31.part, f43.part, f44.part, f56.part, f59.part, f68.part, f74.part])
